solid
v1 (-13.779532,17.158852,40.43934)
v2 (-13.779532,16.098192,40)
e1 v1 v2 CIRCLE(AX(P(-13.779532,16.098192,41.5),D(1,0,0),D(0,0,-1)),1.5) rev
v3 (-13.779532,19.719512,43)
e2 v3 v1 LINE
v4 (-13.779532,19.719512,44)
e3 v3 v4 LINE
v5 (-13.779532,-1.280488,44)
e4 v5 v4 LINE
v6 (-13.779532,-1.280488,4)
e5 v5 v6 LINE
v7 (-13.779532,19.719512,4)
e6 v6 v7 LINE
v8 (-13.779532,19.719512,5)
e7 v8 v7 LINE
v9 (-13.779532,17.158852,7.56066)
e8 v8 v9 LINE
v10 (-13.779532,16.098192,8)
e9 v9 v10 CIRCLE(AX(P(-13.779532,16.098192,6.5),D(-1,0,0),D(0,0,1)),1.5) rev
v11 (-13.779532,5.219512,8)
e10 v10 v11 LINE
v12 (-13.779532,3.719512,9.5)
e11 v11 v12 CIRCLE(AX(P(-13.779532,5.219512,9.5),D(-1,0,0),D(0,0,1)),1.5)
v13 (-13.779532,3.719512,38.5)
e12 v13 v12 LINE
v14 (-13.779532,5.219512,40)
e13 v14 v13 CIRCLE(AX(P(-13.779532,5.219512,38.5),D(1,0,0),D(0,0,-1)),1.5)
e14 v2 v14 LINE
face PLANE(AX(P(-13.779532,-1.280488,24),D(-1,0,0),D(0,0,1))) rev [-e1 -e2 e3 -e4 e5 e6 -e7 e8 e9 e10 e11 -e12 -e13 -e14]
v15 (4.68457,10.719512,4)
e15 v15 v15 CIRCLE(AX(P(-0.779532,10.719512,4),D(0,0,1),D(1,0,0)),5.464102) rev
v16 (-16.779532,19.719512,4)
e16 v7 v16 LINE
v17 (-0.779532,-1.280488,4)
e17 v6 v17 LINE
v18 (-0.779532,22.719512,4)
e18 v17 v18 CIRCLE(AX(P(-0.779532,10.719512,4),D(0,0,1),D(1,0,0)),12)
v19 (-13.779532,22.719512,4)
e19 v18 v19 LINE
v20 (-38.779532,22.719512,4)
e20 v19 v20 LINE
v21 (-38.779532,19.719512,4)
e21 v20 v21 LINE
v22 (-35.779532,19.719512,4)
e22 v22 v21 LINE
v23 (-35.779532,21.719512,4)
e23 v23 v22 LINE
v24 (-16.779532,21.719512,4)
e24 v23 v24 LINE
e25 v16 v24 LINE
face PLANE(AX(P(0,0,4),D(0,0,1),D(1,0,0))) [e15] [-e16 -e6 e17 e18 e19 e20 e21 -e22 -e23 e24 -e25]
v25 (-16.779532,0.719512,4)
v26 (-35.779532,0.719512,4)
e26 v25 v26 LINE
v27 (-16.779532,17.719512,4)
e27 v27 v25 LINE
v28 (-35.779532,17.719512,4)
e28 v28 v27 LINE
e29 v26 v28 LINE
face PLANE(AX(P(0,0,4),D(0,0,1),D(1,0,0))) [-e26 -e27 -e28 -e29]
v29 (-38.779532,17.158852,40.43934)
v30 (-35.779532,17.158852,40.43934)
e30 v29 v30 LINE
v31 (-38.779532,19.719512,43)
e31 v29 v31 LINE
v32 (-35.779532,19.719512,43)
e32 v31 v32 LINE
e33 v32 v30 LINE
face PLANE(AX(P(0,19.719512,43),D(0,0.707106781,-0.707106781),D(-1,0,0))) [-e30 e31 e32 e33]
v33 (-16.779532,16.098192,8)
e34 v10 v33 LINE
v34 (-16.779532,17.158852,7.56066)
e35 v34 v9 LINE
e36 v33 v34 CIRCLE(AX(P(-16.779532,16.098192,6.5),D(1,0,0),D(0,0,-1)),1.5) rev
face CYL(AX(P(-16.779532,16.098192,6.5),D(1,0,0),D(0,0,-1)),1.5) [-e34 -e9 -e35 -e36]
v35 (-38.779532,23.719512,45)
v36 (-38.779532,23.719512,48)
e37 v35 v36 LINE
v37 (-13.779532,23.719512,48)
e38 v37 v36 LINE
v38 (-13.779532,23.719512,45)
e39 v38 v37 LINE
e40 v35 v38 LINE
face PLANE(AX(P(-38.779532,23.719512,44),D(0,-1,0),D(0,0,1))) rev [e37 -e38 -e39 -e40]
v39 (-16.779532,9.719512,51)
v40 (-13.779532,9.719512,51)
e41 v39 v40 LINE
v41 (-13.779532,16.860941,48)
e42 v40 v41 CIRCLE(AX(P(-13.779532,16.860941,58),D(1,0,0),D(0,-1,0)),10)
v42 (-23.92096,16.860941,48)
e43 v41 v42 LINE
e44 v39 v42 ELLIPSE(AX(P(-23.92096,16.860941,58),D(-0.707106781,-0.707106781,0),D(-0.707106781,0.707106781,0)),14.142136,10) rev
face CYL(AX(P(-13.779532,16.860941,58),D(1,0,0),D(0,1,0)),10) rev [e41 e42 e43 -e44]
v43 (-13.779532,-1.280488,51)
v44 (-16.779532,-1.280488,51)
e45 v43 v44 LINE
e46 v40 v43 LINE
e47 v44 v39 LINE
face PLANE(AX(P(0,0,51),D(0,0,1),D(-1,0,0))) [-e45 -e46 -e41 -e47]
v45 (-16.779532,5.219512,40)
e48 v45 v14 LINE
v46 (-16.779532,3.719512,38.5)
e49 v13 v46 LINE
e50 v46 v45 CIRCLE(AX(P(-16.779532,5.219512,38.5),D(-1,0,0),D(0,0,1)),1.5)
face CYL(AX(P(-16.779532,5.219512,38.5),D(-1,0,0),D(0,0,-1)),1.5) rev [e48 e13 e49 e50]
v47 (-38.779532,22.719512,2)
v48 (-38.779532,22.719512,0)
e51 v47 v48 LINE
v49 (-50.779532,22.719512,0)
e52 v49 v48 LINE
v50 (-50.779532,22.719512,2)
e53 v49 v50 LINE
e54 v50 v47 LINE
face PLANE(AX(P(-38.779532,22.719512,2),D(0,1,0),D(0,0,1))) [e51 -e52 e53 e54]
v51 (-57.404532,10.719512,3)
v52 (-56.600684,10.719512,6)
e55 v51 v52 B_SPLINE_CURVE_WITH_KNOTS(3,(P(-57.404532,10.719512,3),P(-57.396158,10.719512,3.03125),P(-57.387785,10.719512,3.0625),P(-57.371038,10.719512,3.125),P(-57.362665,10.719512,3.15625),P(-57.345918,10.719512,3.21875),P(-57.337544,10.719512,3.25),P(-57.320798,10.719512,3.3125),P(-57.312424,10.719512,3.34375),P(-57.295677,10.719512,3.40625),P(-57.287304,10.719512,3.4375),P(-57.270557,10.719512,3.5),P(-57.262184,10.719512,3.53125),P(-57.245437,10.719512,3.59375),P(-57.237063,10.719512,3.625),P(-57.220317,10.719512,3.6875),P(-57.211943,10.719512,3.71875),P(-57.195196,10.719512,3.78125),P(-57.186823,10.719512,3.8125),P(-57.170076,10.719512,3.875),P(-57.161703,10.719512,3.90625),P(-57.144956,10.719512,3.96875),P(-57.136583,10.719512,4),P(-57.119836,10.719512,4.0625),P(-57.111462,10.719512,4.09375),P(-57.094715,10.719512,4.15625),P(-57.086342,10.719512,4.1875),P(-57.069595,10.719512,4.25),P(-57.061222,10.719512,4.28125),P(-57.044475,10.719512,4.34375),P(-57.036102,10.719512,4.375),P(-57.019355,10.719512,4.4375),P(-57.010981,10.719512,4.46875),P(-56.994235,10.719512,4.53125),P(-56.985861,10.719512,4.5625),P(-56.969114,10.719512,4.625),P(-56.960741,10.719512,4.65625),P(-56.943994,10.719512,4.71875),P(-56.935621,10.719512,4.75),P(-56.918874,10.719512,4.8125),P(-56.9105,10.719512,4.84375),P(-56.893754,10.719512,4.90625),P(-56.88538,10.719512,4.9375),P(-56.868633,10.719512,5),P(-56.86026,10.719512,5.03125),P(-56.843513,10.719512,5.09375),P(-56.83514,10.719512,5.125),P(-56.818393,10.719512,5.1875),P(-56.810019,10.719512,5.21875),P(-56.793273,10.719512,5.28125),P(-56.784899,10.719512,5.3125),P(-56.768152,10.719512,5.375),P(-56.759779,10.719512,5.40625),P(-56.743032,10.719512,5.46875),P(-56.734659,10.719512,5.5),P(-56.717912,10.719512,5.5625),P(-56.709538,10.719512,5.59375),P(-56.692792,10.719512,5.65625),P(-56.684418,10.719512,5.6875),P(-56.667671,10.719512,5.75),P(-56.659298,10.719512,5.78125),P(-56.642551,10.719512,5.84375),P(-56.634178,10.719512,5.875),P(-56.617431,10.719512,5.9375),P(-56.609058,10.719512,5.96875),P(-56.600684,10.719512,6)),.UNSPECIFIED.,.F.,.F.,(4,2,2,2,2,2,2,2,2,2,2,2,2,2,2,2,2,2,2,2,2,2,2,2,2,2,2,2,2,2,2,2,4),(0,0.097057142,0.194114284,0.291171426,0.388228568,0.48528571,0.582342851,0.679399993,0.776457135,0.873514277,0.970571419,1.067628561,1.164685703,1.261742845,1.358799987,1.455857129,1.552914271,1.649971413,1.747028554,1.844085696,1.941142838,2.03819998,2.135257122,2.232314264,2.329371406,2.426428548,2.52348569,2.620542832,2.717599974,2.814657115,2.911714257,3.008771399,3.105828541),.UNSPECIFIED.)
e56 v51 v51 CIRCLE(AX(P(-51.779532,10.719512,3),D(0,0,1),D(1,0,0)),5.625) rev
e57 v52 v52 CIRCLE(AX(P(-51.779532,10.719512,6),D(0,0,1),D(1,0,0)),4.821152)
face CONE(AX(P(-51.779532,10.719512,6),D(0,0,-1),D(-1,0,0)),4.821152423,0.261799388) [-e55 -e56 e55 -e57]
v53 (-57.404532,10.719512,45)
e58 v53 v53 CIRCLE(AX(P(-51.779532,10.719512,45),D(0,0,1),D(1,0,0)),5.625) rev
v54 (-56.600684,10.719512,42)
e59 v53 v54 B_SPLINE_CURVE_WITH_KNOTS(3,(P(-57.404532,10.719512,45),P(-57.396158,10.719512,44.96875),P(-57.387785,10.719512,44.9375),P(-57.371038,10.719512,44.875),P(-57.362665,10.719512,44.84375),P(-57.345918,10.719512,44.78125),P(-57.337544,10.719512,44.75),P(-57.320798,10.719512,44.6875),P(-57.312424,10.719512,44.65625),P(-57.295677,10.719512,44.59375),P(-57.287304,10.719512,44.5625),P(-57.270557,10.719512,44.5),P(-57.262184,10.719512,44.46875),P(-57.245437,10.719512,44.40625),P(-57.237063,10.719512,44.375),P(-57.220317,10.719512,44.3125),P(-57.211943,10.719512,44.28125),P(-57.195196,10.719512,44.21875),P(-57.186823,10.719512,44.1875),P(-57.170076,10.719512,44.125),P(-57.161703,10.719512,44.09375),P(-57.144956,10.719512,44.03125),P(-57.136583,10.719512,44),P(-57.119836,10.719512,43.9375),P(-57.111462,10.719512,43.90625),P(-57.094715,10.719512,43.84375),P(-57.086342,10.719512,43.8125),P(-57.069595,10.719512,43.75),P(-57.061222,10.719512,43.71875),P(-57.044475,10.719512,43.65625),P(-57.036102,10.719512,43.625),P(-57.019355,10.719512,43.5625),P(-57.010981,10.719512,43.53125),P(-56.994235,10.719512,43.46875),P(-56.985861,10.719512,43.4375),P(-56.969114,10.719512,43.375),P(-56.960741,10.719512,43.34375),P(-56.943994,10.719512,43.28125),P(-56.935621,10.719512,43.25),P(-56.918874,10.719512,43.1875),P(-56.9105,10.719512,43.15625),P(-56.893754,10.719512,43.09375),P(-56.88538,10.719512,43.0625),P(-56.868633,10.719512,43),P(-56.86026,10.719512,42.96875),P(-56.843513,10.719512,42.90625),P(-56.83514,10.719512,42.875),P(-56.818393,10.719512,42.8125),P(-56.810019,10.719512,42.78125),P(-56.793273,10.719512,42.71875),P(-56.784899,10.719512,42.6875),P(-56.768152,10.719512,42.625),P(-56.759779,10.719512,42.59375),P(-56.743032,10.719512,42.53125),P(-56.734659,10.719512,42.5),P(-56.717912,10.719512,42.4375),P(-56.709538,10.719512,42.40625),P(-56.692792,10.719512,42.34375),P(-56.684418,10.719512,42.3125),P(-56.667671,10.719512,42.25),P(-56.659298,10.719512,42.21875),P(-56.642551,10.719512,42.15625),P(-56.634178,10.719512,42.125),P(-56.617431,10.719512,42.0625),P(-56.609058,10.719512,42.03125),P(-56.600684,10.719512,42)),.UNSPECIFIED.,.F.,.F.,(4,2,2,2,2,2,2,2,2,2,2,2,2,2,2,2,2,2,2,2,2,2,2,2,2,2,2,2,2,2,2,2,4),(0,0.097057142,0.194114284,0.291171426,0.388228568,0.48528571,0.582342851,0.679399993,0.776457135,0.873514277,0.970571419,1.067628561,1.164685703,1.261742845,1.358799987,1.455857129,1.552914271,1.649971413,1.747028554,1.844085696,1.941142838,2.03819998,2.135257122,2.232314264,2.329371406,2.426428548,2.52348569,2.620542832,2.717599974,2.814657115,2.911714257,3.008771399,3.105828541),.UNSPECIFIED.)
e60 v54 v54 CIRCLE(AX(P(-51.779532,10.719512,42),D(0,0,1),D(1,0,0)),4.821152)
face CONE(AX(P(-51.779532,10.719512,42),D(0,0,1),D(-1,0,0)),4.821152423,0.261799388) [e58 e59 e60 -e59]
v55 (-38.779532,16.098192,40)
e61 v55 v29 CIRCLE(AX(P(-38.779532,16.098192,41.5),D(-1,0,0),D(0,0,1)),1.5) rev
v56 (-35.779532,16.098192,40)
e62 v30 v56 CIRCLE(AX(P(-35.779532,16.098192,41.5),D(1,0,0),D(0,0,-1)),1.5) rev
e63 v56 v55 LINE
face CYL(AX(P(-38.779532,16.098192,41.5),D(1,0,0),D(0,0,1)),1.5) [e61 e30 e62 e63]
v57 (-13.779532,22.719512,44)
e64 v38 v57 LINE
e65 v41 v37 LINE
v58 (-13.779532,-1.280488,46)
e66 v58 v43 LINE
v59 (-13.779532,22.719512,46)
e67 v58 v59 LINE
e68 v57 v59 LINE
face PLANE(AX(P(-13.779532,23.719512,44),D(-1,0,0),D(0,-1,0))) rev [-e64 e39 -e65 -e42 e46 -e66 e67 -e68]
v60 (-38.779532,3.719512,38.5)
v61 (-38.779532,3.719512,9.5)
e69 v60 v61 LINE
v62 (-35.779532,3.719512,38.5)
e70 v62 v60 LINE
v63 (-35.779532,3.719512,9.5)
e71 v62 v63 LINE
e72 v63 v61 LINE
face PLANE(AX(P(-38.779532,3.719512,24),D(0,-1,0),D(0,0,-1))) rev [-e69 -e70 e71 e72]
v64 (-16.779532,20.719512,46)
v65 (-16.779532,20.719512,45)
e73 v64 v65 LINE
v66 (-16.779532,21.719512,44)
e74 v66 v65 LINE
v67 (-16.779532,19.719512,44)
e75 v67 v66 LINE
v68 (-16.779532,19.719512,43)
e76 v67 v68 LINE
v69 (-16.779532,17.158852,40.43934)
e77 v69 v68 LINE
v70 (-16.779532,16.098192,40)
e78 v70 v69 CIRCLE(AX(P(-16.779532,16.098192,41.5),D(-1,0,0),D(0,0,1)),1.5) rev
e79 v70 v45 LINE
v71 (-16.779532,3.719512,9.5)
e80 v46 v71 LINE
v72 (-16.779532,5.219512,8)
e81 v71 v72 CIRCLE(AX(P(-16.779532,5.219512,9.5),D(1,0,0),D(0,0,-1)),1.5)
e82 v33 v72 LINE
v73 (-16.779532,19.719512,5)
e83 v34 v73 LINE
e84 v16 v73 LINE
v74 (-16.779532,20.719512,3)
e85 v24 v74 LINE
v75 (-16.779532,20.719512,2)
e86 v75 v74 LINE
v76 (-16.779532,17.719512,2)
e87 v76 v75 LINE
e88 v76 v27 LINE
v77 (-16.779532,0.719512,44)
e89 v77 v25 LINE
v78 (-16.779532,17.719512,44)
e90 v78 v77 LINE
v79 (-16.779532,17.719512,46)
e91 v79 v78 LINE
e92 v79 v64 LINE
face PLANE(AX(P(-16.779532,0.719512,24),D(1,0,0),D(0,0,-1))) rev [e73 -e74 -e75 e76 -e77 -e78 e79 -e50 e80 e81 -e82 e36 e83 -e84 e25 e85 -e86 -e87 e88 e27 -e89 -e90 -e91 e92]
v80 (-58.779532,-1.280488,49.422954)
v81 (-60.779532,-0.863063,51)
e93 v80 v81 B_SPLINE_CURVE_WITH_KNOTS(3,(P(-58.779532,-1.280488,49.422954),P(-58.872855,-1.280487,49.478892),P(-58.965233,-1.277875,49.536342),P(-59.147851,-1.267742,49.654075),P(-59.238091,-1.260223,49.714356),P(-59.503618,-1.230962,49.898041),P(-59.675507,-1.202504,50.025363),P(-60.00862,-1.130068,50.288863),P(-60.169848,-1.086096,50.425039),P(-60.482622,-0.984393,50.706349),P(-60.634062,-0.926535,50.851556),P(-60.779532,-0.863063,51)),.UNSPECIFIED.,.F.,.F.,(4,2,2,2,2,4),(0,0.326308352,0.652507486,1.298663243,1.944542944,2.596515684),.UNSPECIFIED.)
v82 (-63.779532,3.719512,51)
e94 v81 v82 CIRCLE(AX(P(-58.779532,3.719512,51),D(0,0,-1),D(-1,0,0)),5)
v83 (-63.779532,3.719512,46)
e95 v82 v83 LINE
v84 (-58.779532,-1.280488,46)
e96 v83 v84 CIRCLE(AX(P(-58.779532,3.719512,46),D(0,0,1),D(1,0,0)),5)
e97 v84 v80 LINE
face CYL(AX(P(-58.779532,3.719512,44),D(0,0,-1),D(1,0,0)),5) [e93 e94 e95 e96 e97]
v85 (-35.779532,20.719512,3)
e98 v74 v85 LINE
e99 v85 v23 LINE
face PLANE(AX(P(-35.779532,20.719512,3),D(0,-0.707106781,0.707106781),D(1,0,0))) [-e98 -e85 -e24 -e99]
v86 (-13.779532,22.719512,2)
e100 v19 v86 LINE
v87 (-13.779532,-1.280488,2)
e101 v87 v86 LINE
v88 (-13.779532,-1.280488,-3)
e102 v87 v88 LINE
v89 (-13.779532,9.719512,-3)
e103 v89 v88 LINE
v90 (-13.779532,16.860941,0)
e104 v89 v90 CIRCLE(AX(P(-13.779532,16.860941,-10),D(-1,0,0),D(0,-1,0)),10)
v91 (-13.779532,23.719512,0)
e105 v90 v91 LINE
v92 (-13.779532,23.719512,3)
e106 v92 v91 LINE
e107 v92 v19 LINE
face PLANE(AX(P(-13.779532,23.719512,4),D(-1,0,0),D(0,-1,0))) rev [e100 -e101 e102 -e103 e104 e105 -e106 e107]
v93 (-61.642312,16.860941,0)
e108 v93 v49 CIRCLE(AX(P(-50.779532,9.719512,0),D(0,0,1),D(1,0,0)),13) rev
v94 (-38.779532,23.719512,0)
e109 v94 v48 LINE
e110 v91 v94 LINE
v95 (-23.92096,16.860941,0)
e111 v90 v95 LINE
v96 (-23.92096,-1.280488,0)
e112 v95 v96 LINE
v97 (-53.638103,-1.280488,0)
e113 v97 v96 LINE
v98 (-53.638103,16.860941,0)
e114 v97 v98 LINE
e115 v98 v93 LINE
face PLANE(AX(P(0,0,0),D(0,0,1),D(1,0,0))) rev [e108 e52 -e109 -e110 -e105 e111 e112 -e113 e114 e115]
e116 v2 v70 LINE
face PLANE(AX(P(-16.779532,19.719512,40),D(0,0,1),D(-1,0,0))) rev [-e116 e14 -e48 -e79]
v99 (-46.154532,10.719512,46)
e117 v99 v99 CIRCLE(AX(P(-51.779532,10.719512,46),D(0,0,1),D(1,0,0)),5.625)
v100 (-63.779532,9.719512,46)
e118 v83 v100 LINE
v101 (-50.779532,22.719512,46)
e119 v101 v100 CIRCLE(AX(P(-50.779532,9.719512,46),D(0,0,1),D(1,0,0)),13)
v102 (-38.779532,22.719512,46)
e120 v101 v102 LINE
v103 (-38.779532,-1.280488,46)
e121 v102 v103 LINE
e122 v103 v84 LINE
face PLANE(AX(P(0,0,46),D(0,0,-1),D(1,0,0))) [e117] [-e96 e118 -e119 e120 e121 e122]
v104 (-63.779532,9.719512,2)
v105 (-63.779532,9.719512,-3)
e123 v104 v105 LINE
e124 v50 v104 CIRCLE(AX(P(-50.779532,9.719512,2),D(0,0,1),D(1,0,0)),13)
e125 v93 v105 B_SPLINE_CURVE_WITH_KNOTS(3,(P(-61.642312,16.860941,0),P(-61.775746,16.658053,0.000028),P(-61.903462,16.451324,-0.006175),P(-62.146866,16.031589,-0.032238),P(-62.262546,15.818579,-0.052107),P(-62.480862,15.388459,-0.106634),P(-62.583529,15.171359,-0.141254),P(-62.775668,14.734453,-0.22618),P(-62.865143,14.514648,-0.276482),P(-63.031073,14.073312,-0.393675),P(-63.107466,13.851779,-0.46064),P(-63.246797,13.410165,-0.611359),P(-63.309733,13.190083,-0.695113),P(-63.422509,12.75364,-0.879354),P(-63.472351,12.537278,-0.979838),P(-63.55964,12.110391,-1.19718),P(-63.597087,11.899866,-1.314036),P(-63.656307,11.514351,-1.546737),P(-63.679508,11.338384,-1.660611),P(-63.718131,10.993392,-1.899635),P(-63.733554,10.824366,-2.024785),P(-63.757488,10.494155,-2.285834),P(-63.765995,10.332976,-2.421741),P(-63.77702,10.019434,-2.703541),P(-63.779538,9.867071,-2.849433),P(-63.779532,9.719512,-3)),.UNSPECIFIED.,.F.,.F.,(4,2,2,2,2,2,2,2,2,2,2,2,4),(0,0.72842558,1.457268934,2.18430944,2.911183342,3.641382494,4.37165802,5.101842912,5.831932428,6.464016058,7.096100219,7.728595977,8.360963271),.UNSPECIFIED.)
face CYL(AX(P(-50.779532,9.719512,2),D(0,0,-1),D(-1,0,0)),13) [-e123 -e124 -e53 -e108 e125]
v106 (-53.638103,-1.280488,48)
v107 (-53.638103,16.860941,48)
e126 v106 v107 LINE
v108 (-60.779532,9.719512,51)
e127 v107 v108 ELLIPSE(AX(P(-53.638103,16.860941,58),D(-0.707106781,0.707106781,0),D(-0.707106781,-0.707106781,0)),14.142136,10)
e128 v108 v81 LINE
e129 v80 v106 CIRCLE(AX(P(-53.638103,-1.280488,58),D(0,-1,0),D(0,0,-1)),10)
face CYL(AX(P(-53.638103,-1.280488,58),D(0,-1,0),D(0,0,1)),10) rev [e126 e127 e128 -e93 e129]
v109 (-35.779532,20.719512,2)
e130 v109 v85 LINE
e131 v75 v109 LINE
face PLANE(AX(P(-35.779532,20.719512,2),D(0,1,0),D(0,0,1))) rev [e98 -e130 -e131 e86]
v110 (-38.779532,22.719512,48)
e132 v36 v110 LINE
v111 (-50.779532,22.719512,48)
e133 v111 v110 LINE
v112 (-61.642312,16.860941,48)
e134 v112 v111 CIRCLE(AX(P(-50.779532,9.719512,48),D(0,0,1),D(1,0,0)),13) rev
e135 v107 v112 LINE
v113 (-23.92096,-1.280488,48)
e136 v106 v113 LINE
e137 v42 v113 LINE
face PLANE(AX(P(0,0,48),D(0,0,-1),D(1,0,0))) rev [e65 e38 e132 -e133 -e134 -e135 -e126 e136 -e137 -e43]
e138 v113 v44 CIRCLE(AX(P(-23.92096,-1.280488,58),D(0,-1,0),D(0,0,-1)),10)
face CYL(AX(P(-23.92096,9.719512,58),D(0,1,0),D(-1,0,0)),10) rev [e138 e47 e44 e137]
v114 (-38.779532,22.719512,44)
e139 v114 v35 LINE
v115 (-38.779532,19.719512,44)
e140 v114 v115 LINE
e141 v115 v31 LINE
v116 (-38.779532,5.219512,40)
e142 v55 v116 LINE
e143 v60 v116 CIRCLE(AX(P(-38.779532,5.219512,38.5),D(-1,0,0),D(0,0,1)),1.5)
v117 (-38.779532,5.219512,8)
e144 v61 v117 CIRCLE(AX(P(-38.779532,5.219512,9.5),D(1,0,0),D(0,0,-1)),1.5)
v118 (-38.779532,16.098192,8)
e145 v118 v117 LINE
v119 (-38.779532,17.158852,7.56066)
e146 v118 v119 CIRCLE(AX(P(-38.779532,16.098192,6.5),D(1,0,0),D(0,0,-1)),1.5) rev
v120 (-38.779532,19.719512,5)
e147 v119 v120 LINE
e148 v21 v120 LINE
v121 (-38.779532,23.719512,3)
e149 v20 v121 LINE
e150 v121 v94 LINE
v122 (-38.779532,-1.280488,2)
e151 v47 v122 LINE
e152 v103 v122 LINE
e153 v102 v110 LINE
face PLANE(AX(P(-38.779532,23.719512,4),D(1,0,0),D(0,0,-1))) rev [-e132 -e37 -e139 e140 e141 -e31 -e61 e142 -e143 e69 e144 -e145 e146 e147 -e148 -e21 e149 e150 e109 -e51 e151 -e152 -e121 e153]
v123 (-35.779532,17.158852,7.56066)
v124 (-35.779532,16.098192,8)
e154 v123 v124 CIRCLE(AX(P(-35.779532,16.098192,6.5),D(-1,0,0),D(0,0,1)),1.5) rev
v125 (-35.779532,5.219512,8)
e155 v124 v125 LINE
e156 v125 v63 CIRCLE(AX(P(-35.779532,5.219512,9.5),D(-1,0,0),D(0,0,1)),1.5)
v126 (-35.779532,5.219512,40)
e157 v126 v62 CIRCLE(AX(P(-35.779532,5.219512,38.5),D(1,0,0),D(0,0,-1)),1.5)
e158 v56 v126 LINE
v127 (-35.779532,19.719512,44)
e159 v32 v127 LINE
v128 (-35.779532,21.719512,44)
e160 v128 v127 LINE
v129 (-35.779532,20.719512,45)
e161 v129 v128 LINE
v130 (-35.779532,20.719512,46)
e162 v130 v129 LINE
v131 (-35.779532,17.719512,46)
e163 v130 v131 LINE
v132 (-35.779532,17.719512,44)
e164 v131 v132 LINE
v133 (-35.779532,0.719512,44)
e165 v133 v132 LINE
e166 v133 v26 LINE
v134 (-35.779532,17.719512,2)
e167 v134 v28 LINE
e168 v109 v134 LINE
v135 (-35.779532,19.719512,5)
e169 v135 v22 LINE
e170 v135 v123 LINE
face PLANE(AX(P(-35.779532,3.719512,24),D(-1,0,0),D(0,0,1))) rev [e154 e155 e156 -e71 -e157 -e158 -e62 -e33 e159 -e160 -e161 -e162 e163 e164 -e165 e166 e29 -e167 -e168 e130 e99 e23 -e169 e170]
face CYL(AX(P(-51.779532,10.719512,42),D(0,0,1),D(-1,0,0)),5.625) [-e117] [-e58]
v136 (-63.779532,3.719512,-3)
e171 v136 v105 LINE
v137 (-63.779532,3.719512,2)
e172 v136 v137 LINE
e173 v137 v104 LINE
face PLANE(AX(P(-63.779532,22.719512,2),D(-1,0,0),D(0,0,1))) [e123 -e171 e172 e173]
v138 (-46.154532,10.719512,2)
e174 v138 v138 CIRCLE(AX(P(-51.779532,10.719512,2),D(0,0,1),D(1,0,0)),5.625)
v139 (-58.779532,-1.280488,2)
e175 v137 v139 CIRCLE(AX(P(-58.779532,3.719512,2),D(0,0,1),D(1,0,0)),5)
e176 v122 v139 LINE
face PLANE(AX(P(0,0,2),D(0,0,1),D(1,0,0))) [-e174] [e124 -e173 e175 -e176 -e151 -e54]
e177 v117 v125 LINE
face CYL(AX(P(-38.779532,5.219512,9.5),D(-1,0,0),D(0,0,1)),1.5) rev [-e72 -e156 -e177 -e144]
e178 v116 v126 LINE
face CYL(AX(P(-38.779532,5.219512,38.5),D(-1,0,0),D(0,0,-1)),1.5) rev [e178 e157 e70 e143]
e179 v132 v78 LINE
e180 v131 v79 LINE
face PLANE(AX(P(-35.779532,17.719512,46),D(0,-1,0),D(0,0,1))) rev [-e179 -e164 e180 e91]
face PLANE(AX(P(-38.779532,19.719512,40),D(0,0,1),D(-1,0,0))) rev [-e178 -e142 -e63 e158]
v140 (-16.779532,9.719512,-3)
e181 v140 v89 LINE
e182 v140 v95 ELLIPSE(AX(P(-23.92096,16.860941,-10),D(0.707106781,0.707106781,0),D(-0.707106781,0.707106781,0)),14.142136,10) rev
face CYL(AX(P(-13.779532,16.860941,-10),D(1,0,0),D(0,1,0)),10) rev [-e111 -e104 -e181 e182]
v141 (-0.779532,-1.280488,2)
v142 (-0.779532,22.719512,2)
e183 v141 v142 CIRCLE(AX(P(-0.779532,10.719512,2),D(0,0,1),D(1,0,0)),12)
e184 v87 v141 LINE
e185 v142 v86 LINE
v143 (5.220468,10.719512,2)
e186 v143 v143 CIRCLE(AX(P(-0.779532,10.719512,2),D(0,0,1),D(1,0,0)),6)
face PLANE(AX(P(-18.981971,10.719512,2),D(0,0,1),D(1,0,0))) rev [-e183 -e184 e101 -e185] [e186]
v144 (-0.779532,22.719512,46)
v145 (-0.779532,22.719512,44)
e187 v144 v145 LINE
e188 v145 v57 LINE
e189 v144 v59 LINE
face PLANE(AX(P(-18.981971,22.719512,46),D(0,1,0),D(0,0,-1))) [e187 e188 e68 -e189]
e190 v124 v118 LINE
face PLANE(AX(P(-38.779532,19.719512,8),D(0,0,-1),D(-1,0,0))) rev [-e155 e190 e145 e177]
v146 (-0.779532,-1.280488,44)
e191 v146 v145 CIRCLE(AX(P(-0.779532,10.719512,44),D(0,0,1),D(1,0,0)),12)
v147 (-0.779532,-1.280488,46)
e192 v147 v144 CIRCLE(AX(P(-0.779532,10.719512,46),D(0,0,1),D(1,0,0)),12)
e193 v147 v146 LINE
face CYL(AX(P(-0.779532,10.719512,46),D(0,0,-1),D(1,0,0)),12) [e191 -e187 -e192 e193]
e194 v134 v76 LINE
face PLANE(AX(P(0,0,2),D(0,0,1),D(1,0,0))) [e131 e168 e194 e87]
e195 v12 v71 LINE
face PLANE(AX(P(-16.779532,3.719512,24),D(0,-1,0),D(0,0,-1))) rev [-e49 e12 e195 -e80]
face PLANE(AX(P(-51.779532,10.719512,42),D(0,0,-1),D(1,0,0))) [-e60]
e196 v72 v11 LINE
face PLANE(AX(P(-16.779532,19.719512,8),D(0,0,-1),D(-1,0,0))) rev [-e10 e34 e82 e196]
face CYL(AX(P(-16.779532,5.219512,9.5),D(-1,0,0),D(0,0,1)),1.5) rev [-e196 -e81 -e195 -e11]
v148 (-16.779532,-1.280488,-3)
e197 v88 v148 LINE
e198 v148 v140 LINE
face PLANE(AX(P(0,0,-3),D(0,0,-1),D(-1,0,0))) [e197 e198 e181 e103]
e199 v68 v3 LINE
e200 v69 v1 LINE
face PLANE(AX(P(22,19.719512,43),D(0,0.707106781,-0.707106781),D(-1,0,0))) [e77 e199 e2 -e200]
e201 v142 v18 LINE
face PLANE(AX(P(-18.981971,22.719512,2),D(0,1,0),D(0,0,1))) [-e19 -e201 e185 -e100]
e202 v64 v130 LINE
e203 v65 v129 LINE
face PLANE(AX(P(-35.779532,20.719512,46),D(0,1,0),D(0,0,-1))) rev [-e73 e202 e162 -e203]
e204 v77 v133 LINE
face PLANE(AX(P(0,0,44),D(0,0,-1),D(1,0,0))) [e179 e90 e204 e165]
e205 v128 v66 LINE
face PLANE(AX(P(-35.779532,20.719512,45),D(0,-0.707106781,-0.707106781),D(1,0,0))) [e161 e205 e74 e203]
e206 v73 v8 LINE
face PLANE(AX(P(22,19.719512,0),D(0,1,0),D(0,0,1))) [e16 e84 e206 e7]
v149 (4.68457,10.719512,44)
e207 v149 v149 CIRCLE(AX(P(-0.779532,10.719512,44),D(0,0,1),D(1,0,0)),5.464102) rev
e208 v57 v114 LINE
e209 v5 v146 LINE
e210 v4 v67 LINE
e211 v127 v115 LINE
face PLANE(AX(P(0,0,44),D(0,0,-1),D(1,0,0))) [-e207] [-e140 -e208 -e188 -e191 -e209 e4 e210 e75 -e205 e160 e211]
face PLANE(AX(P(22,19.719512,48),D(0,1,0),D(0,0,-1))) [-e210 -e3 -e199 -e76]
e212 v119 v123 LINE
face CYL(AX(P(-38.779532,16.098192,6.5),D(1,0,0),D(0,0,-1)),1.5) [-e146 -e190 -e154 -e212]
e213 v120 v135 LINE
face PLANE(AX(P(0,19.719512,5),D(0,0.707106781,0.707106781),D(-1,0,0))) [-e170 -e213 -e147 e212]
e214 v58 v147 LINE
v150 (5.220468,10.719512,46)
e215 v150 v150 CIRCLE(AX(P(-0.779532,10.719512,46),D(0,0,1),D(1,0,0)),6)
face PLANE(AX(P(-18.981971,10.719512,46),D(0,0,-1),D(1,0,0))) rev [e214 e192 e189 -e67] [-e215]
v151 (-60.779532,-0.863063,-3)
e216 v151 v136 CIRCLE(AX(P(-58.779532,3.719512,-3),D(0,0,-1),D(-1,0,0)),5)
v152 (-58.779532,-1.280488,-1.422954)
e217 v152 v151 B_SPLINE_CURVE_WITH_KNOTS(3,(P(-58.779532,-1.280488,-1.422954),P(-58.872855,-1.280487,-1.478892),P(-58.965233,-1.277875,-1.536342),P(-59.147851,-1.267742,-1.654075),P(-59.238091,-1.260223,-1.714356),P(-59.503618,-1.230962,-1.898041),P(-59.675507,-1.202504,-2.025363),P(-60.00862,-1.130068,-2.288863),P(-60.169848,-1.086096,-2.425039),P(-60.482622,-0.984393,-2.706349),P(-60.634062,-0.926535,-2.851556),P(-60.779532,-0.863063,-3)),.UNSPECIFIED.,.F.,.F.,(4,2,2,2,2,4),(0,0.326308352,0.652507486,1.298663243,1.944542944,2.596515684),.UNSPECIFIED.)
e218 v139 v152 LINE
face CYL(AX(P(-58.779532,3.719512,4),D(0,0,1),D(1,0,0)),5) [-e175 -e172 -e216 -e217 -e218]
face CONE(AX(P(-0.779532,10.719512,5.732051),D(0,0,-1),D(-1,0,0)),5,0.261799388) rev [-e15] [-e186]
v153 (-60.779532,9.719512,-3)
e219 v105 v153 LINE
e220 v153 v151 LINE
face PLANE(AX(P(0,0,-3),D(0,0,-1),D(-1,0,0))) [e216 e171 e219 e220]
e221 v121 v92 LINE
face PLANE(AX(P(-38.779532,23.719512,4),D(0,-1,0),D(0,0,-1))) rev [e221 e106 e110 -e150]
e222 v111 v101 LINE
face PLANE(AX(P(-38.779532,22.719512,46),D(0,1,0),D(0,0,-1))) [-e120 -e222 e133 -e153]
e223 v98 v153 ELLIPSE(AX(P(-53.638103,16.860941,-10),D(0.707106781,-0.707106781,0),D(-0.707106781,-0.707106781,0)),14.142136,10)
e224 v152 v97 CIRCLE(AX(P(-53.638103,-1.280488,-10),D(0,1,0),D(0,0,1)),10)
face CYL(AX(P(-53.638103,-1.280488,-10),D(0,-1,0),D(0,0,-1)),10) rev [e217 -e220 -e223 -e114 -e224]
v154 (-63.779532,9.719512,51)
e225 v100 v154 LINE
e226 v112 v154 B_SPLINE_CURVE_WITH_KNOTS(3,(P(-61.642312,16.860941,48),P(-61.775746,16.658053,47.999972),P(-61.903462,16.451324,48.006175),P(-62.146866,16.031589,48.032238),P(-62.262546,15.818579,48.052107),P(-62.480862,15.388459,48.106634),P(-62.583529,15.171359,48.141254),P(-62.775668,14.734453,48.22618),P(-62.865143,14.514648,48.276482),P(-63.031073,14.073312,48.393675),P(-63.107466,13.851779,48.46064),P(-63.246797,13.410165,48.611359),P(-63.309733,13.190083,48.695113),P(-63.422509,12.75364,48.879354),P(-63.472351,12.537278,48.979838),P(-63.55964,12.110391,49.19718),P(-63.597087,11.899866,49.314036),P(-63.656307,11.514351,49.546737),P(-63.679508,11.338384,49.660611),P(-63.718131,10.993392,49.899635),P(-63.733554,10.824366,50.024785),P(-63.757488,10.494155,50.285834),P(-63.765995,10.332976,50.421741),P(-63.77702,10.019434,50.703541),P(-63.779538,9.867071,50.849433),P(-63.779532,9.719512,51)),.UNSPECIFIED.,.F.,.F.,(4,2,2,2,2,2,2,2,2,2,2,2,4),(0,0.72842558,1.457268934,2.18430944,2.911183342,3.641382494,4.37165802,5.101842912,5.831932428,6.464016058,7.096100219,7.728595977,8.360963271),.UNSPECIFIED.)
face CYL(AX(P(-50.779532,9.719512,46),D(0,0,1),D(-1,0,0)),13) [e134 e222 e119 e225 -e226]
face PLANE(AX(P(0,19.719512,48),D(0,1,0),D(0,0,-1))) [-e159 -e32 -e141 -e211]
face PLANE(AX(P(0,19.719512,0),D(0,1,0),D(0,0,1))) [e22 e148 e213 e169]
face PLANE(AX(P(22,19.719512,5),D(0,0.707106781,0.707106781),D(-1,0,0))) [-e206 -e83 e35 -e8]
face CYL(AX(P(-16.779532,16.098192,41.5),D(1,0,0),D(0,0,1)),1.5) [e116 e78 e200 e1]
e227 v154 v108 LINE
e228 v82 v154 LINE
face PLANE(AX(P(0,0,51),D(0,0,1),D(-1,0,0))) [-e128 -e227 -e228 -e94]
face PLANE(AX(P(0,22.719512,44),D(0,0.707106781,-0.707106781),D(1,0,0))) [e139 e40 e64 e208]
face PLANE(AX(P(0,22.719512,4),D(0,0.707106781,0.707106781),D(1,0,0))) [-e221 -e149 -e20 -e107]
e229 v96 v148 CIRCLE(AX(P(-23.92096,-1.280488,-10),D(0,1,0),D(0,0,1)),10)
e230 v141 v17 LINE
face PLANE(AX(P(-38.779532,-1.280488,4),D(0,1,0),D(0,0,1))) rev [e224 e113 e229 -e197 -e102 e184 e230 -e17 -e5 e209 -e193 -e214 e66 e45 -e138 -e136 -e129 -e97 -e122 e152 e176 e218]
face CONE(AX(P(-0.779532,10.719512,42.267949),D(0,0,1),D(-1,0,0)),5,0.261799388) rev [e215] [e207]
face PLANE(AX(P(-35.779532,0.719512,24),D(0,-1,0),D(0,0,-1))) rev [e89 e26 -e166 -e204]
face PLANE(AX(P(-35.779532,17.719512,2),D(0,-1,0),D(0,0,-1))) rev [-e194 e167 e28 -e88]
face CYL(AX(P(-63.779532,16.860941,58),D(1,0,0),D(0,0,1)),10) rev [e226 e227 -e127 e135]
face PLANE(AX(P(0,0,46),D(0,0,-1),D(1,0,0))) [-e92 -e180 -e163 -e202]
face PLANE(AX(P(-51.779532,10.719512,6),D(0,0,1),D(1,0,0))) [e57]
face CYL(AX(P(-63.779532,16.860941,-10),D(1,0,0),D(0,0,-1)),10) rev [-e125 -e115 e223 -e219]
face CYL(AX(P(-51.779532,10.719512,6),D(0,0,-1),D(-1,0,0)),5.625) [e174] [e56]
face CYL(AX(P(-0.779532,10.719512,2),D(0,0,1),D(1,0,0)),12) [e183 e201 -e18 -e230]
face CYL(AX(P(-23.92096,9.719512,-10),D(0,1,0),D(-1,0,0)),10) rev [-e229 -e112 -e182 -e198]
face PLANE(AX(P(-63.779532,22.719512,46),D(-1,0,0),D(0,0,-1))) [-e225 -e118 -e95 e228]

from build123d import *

# Parameters (mm, degrees)
SKETCH_1_W             = 25
SKETCH_1_H             = 25
EXTRUDE_1_DEPTH        = 4
SKETCH_2_W             = 25
SKETCH_2_H             = 24
EXTRUDE_2_DEPTH        = 2
SKETCH_3_R             = 5.625
EXTRUDE_3_DEPTH        = 4
CHAMFER_1_SIZE         = 3
CHAMFER_1_SIZE2        = 0.803847577
EXTRUDE_4_DEPTH        = 2
SKETCH_6_R             = 5
CUT_EXTRUDE_2_DEPTH    = 10
EXTRUDE_6_DEPTH        = 20
SKETCH_9_W             = 19
SKETCH_9_H             = 3
CUT_EXTRUDE_4_DEPTH    = 2
CHAMFER_2_SIZE         = 1
CHAMFER_3_SIZE         = 3.732050808
CHAMFER_3_SIZE_2       = 1
FILLET_1_R             = 13
CHAMFER_4_SIZE         = 1
SKETCH_11_W            = 3
SKETCH_11_H            = 4
EXTRUDE_7_DEPTH        = 16
PATTERN_LINEAR_1_COUNT = 2
PATTERN_LINEAR_1_PITCH = 22
CHAMFER_6_SIZE         = 3
FILLET_2_R             = 1.5
SKETCH1_W              = 3
SKETCH1_H              = 11
BOSS_EXTRUDE1_DEPTH    = 3
FILLET1_R              = 10
SKETCH2_W              = 3
SKETCH2_H              = 11
BOSS_EXTRUDE2_DEPTH    = 3
FILLET2_R              = 10
FILLET3_R              = 5


with BuildPart() as part:
    # Эскиз1 → Бобышка-Вытянуть1 (new body)
    with BuildSketch(Plane.XY):
        with Locations((-26.279531703, 11.219512195)):
            Rectangle(SKETCH_1_W, SKETCH_1_H)
    extrude(amount=EXTRUDE_1_DEPTH)

    # Эскиз2 → Бобышка-Вытянуть2 (add)
    with BuildSketch(Plane(origin=(0, 0, 0), x_dir=(-1, 0, 0), z_dir=(0, 0, -1))):
        with Locations((51.279531703, 10.719512195)):
            Rectangle(SKETCH_2_W, SKETCH_2_H)
    extrude(amount=-EXTRUDE_2_DEPTH)

    # Эскиз3 → Бобышка-Вытянуть3 (add)
    with BuildSketch(Plane.XY.offset(2)):
        with Locations((-51.779531703, 10.719512195)):
            Circle(SKETCH_3_R)
    extrude(amount=EXTRUDE_3_DEPTH)

    # Фаска1
    chamfer_1_edges = [part.edges().sort_by_distance(p)[0] for p in [
        (-57.404531703, 10.719512195, 6),
    ]]
    chamfer_1_side = [part.faces().sort_by_distance(p)[0] for p in [
        (-57.404531703, 10.719512195, 4),
    ]]
    chamfer(chamfer_1_edges, length=CHAMFER_1_SIZE, length2=CHAMFER_1_SIZE2, reference=chamfer_1_side[0])

    # Эскиз5 → Бобышка-Вытянуть4 (add)
    with BuildSketch(Plane.XY.offset(4)):
        with BuildLine():
            Line((-18.981970926, 22.719512195), (-0.779531703, 22.719512195))
            ThreePointArc((-0.779531703, 22.719512195), (11.220468297, 10.719512195), (-0.779531703, -1.280487805))
            Line((-0.779531703, -1.280487805), (-18.981970926, -1.280487805))
            ThreePointArc((-18.981970926, -1.280487805), (-30.981970926, 10.719512195), (-18.981970926, 22.719512195))
        make_face()
    extrude(amount=-EXTRUDE_4_DEPTH)

    # Эскиз6 → Вырез-Вытянуть2 (cut)
    with BuildSketch(Plane(origin=(0, 0, 2), x_dir=(-1, 0, 0), z_dir=(0, 0, -1))):
        with Locations((0.779531703, 10.719512195)):
            Circle(SKETCH_6_R)
    extrude(amount=-CUT_EXTRUDE_2_DEPTH, mode=Mode.SUBTRACT)

    # Эскиз8 → Бобышка-Вытянуть6 (add)
    with BuildSketch(Plane.XY.offset(4)):
        Polygon((-38.779531703, 3.719512195), (-35.779531703, 3.719512195), (-35.779531703, 0.719512195), (-16.779531703, 0.719512195), (-16.779531703, 3.719512195), (-13.779531703, 3.719512195), (-13.779531703, -1.280487805), (-38.779531703, -1.280487805), align=None)
    extrude(amount=EXTRUDE_6_DEPTH)

    # Эскиз9 → Вырез-Вытянуть4 (cut)
    with BuildSketch(Plane.XY.offset(4)):
        with Locations((-26.279531703, 19.219512195)):
            Rectangle(SKETCH_9_W, SKETCH_9_H)
    extrude(amount=-CUT_EXTRUDE_4_DEPTH, mode=Mode.SUBTRACT)

    # Фаска2
    chamfer_2_edges = [part.edges().sort_by_distance(p)[0] for p in [
        (-26.279531703, 20.719512195, 4),
    ]]
    chamfer(chamfer_2_edges, length=CHAMFER_2_SIZE)

    # Фаска3
    # the kernel refuses this chamfer: 3.732050808, 1 mm, written as the material it takes off along each edge
    with BuildSketch(Plane(origin=(-0.779531703, 10.719512195, 2), x_dir=(-1, 0, 0), z_dir=(0, -1, 0))) as chamfer_3_piece_1:
        Polygon((5, -CHAMFER_3_SIZE), (5 + CHAMFER_3_SIZE_2, 0), (5, 0), align=None)
    revolve(axis=Axis((-0.779531703, 10.719512195, 2), (0, 0, -1)), mode=Mode.SUBTRACT)

    # Скругление1
    fillet_1_edges = [part.edges().sort_by_distance(p)[0] for p in [
        (-63.779531703, 22.719512195, 1),
    ]]
    fillet(fillet_1_edges, radius=FILLET_1_R)

    # Фаска4
    chamfer_4_edges = [part.edges().sort_by_distance(p)[0] for p in [
        (-26.279531703, 23.719512195, 4),
    ]]
    chamfer(chamfer_4_edges, length=CHAMFER_4_SIZE)

    # Эскиз11 → Бобышка-Вытянуть7 (add)
    with BuildSketch(Plane(origin=(0, 3.719512195, 0), x_dir=(1, 0, 0), z_dir=(0, 1, 0))):
        with Locations((-37.279531703, -6)):
            Rectangle(SKETCH_11_W, SKETCH_11_H)
    extrude_7 = extrude(amount=EXTRUDE_7_DEPTH)

    # Линейный массив1: Бобышка-Вытянуть7 ×2
    with Locations(*[(i * PATTERN_LINEAR_1_PITCH, 0, 0) for i in range(1, PATTERN_LINEAR_1_COUNT)]):
        add(extrude_7)

    # Фаска6
    chamfer_6_edges = [part.edges().sort_by_distance(p)[0] for p in [
        (-37.279531703, 19.719512195, 8),
        (-15.279531703, 19.719512195, 8),
    ]]
    chamfer(chamfer_6_edges, length=CHAMFER_6_SIZE)

    # Скругление2
    fillet_2_edges = [part.edges().sort_by_distance(p)[0] for p in [
        (-37.279531703, 3.719512195, 8),
        (-15.279531703, 3.719512195, 8),
        (-15.279531703, 16.719512195, 8),
        (-37.279531703, 16.719512195, 8),
    ]]
    fillet(fillet_2_edges, radius=FILLET_2_R)

    # Sketch1 → Boss-Extrude1 (add)
    with BuildSketch(Plane(origin=(0, 0, 0), x_dir=(-1, 0, 0), z_dir=(0, 0, -1))):
        with Locations((15.279531703, 4.219512195)):
            Rectangle(SKETCH1_W, SKETCH1_H)
    extrude(amount=BOSS_EXTRUDE1_DEPTH)

    # Fillet1
    # the kernel refuses this fillet: 10 mm, written as the material it adds along each edge
    with BuildSketch(Plane(origin=(-16.779531703, 9.719512195, 0), x_dir=(-1, 0, 0), z_dir=(0, -1, 0))) as fillet1_piece_1:
        with BuildLine():
            CenterArc((7.141428429, 10), FILLET1_R, 224.427004001, 45.572995999)
            Line((0, 3), (-0.142828569, 2.86))
            ThreePointArc((-0.142828569, 2.86), (-0.2, 1.5), (-0.2, 0))
            Line((-0.2, 0), (0, -0.2))
            Line((0, -0.2), (7.141428429, -0.2))
            Line((7.141428429, -0.2), (7.141428429, 0))
        make_face()
    extrude(amount=11)
    with BuildSketch(Plane(origin=(-13.779531703, 9.719512195, 0), x_dir=(0, 1, 0), z_dir=(-1, 0, 0))) as fillet1_piece_2:
        with BuildLine():
            CenterArc((7.141428429, 10), FILLET1_R, 224.427004001, 45.572995999)
            Line((0, 3), (-0.142828569, 2.86))
            ThreePointArc((-0.142828569, 2.86), (-0.2, 1.5), (-0.2, 0))
            Line((-0.2, 0), (0, -0.2))
            Line((0, -0.2), (7.141428429, -0.2))
            Line((7.141428429, -0.2), (7.141428429, 0))
        make_face()
    extrude(amount=3)
    with BuildSketch(Plane(origin=(-16.779531703, 27.573083266, 0), x_dir=(-1, 0, 0), z_dir=(0, -1, 0))) as fillet1_piece_3a_section:
        with BuildLine():
            CenterArc((7.141428429, 10), FILLET1_R, 224.427004001, 45.572995999)
            Line((0, 3), (-0.142828569, 2.86))
            ThreePointArc((-0.142828569, 2.86), (-0.2, 1.5), (-0.2, 0))
            Line((-0.2, 0), (0, -0.2))
            Line((0, -0.2), (7.141428429, -0.2))
            Line((7.141428429, -0.2), (7.141428429, 0))
        make_face()
    fillet1_piece_3a = extrude(amount=28.853571071, mode=Mode.PRIVATE)
    fillet1_piece_3a = split(fillet1_piece_3a, bisect_by=Plane(origin=(-16.779531703, 23.719512195, 0), z_dir=(0, -1, 0)), keep=Keep.TOP, mode=Mode.PRIVATE)
    fillet1_piece_3a = split(fillet1_piece_3a, bisect_by=Plane(origin=(-16.779531703, 9.719512195, 0), z_dir=(0, 1, 0)), keep=Keep.TOP, mode=Mode.PRIVATE)
    with BuildSketch(Plane(origin=(-13.779531703, 9.719512195, 0), x_dir=(0, 1, 0), z_dir=(-1, 0, 0))) as fillet1_piece_3b_section:
        with BuildLine():
            CenterArc((7.141428429, 10), FILLET1_R, 224.427004001, 45.572995999)
            Line((0, 3), (-0.142828569, 2.86))
            ThreePointArc((-0.142828569, 2.86), (-0.2, 1.5), (-0.2, 0))
            Line((-0.2, 0), (0, -0.2))
            Line((0, -0.2), (7.141428429, -0.2))
            Line((7.141428429, -0.2), (7.141428429, 0))
        make_face()
    fillet1_piece_3b = extrude(amount=20.853571071, mode=Mode.PRIVATE)
    fillet1_piece_3b = split(fillet1_piece_3b, bisect_by=Plane(origin=(-16.779531703, 9.719512195, 0), z_dir=(-1, 0, 0)), keep=Keep.TOP, mode=Mode.PRIVATE)
    fillet1_piece_3 = fillet1_piece_3a & fillet1_piece_3b
    add(fillet1_piece_3)

    # Sketch2 → Boss-Extrude2 (add)
    with BuildSketch(Plane(origin=(0, 0, 0), x_dir=(-1, 0, 0), z_dir=(0, 0, -1))):
        with Locations((62.279531703, 4.219512195)):
            Rectangle(SKETCH2_W, SKETCH2_H)
    extrude(amount=BOSS_EXTRUDE2_DEPTH)

    # Fillet2
    # the kernel refuses this fillet: 10 mm, written as the material it adds along each edge
    with BuildSketch(Plane(origin=(-60.779531703, 9.719512195, 0), x_dir=(0, 1, 0), z_dir=(-1, 0, 0))) as fillet2_piece_1_section:
        with BuildLine():
            CenterArc((7.141428429, 10), FILLET2_R, 224.427004001, 45.572995999)
            Line((0, 3), (0, 0))
            Line((0, 0), (7.141428429, 0))
        make_face()
    fillet2_piece_1 = extrude(amount=20.853571071, mode=Mode.PRIVATE)
    fillet2_piece_1 = fillet2_piece_1 & Plane(origin=(-50.779531703, 9.719512195, 0), x_dir=(0, 1, 0), z_dir=(0, 0, 1)) * Cylinder(13, 71, mode=Mode.PRIVATE)
    add(fillet2_piece_1)
    with BuildSketch(Plane(origin=(-60.779531703, -1.280487805, 0), x_dir=(1, 0, 0), z_dir=(0, 1, 0))) as fillet2_piece_2:
        with BuildLine():
            CenterArc((7.141428429, 10), FILLET2_R, 224.427004001, 45.572995999)
            Line((0, 3), (0, 0))
            Line((0, 0), (7.141428429, 0))
        make_face()
    extrude(amount=11)
    with BuildSketch(Plane(origin=(-42.925960632, 9.719512195, 0), x_dir=(0, 1, 0), z_dir=(-1, 0, 0))) as fillet2_piece_3a_section:
        with BuildLine():
            CenterArc((7.141428429, 10), FILLET2_R, 224.427004001, 45.572995999)
            Line((0, 3), (0, 0))
            Line((0, 0), (7.141428429, 0))
        make_face()
    fillet2_piece_3a = extrude(amount=20.853571071, mode=Mode.PRIVATE)
    fillet2_piece_3a = split(fillet2_piece_3a, bisect_by=Plane(origin=(-60.779531703, 9.719512195, 0), z_dir=(1, 0, 0)), keep=Keep.TOP, mode=Mode.PRIVATE)
    with BuildSketch(Plane(origin=(-60.779531703, -1.280487805, 0), x_dir=(1, 0, 0), z_dir=(0, 1, 0))) as fillet2_piece_3b_section:
        with BuildLine():
            CenterArc((7.141428429, 10), FILLET2_R, 224.427004001, 45.572995999)
            Line((0, 3), (0, 0))
            Line((0, 0), (7.141428429, 0))
        make_face()
    fillet2_piece_3b = extrude(amount=28.853571071, mode=Mode.PRIVATE)
    fillet2_piece_3b = fillet2_piece_3b & Plane(origin=(-50.779531703, 9.719512195, 0), x_dir=(0, 1, 0), z_dir=(0, 0, 1)) * Cylinder(13, 87, mode=Mode.PRIVATE)
    fillet2_piece_3b = split(fillet2_piece_3b, bisect_by=Plane(origin=(-60.779531703, 9.719512195, 0), z_dir=(0, 1, 0)), keep=Keep.TOP, mode=Mode.PRIVATE)
    fillet2_piece_3 = fillet2_piece_3a & fillet2_piece_3b
    add(fillet2_piece_3)

    # Fillet3
    fillet3_edges = [part.edges().sort_by_distance(p)[0] for p in [
        (-63.779531703, -1.280487805, -0.5),
    ]]
    fillet(fillet3_edges, radius=FILLET3_R)

    # Зеркальное отражение1: part across plane


with BuildPart() as part_1:
    add(part.part)
    add(part.part.mirror(Plane(origin=(0, 0, 24), x_dir=(1, 0, 0), z_dir=(0, 0, -1))))


solid = part_1.part
